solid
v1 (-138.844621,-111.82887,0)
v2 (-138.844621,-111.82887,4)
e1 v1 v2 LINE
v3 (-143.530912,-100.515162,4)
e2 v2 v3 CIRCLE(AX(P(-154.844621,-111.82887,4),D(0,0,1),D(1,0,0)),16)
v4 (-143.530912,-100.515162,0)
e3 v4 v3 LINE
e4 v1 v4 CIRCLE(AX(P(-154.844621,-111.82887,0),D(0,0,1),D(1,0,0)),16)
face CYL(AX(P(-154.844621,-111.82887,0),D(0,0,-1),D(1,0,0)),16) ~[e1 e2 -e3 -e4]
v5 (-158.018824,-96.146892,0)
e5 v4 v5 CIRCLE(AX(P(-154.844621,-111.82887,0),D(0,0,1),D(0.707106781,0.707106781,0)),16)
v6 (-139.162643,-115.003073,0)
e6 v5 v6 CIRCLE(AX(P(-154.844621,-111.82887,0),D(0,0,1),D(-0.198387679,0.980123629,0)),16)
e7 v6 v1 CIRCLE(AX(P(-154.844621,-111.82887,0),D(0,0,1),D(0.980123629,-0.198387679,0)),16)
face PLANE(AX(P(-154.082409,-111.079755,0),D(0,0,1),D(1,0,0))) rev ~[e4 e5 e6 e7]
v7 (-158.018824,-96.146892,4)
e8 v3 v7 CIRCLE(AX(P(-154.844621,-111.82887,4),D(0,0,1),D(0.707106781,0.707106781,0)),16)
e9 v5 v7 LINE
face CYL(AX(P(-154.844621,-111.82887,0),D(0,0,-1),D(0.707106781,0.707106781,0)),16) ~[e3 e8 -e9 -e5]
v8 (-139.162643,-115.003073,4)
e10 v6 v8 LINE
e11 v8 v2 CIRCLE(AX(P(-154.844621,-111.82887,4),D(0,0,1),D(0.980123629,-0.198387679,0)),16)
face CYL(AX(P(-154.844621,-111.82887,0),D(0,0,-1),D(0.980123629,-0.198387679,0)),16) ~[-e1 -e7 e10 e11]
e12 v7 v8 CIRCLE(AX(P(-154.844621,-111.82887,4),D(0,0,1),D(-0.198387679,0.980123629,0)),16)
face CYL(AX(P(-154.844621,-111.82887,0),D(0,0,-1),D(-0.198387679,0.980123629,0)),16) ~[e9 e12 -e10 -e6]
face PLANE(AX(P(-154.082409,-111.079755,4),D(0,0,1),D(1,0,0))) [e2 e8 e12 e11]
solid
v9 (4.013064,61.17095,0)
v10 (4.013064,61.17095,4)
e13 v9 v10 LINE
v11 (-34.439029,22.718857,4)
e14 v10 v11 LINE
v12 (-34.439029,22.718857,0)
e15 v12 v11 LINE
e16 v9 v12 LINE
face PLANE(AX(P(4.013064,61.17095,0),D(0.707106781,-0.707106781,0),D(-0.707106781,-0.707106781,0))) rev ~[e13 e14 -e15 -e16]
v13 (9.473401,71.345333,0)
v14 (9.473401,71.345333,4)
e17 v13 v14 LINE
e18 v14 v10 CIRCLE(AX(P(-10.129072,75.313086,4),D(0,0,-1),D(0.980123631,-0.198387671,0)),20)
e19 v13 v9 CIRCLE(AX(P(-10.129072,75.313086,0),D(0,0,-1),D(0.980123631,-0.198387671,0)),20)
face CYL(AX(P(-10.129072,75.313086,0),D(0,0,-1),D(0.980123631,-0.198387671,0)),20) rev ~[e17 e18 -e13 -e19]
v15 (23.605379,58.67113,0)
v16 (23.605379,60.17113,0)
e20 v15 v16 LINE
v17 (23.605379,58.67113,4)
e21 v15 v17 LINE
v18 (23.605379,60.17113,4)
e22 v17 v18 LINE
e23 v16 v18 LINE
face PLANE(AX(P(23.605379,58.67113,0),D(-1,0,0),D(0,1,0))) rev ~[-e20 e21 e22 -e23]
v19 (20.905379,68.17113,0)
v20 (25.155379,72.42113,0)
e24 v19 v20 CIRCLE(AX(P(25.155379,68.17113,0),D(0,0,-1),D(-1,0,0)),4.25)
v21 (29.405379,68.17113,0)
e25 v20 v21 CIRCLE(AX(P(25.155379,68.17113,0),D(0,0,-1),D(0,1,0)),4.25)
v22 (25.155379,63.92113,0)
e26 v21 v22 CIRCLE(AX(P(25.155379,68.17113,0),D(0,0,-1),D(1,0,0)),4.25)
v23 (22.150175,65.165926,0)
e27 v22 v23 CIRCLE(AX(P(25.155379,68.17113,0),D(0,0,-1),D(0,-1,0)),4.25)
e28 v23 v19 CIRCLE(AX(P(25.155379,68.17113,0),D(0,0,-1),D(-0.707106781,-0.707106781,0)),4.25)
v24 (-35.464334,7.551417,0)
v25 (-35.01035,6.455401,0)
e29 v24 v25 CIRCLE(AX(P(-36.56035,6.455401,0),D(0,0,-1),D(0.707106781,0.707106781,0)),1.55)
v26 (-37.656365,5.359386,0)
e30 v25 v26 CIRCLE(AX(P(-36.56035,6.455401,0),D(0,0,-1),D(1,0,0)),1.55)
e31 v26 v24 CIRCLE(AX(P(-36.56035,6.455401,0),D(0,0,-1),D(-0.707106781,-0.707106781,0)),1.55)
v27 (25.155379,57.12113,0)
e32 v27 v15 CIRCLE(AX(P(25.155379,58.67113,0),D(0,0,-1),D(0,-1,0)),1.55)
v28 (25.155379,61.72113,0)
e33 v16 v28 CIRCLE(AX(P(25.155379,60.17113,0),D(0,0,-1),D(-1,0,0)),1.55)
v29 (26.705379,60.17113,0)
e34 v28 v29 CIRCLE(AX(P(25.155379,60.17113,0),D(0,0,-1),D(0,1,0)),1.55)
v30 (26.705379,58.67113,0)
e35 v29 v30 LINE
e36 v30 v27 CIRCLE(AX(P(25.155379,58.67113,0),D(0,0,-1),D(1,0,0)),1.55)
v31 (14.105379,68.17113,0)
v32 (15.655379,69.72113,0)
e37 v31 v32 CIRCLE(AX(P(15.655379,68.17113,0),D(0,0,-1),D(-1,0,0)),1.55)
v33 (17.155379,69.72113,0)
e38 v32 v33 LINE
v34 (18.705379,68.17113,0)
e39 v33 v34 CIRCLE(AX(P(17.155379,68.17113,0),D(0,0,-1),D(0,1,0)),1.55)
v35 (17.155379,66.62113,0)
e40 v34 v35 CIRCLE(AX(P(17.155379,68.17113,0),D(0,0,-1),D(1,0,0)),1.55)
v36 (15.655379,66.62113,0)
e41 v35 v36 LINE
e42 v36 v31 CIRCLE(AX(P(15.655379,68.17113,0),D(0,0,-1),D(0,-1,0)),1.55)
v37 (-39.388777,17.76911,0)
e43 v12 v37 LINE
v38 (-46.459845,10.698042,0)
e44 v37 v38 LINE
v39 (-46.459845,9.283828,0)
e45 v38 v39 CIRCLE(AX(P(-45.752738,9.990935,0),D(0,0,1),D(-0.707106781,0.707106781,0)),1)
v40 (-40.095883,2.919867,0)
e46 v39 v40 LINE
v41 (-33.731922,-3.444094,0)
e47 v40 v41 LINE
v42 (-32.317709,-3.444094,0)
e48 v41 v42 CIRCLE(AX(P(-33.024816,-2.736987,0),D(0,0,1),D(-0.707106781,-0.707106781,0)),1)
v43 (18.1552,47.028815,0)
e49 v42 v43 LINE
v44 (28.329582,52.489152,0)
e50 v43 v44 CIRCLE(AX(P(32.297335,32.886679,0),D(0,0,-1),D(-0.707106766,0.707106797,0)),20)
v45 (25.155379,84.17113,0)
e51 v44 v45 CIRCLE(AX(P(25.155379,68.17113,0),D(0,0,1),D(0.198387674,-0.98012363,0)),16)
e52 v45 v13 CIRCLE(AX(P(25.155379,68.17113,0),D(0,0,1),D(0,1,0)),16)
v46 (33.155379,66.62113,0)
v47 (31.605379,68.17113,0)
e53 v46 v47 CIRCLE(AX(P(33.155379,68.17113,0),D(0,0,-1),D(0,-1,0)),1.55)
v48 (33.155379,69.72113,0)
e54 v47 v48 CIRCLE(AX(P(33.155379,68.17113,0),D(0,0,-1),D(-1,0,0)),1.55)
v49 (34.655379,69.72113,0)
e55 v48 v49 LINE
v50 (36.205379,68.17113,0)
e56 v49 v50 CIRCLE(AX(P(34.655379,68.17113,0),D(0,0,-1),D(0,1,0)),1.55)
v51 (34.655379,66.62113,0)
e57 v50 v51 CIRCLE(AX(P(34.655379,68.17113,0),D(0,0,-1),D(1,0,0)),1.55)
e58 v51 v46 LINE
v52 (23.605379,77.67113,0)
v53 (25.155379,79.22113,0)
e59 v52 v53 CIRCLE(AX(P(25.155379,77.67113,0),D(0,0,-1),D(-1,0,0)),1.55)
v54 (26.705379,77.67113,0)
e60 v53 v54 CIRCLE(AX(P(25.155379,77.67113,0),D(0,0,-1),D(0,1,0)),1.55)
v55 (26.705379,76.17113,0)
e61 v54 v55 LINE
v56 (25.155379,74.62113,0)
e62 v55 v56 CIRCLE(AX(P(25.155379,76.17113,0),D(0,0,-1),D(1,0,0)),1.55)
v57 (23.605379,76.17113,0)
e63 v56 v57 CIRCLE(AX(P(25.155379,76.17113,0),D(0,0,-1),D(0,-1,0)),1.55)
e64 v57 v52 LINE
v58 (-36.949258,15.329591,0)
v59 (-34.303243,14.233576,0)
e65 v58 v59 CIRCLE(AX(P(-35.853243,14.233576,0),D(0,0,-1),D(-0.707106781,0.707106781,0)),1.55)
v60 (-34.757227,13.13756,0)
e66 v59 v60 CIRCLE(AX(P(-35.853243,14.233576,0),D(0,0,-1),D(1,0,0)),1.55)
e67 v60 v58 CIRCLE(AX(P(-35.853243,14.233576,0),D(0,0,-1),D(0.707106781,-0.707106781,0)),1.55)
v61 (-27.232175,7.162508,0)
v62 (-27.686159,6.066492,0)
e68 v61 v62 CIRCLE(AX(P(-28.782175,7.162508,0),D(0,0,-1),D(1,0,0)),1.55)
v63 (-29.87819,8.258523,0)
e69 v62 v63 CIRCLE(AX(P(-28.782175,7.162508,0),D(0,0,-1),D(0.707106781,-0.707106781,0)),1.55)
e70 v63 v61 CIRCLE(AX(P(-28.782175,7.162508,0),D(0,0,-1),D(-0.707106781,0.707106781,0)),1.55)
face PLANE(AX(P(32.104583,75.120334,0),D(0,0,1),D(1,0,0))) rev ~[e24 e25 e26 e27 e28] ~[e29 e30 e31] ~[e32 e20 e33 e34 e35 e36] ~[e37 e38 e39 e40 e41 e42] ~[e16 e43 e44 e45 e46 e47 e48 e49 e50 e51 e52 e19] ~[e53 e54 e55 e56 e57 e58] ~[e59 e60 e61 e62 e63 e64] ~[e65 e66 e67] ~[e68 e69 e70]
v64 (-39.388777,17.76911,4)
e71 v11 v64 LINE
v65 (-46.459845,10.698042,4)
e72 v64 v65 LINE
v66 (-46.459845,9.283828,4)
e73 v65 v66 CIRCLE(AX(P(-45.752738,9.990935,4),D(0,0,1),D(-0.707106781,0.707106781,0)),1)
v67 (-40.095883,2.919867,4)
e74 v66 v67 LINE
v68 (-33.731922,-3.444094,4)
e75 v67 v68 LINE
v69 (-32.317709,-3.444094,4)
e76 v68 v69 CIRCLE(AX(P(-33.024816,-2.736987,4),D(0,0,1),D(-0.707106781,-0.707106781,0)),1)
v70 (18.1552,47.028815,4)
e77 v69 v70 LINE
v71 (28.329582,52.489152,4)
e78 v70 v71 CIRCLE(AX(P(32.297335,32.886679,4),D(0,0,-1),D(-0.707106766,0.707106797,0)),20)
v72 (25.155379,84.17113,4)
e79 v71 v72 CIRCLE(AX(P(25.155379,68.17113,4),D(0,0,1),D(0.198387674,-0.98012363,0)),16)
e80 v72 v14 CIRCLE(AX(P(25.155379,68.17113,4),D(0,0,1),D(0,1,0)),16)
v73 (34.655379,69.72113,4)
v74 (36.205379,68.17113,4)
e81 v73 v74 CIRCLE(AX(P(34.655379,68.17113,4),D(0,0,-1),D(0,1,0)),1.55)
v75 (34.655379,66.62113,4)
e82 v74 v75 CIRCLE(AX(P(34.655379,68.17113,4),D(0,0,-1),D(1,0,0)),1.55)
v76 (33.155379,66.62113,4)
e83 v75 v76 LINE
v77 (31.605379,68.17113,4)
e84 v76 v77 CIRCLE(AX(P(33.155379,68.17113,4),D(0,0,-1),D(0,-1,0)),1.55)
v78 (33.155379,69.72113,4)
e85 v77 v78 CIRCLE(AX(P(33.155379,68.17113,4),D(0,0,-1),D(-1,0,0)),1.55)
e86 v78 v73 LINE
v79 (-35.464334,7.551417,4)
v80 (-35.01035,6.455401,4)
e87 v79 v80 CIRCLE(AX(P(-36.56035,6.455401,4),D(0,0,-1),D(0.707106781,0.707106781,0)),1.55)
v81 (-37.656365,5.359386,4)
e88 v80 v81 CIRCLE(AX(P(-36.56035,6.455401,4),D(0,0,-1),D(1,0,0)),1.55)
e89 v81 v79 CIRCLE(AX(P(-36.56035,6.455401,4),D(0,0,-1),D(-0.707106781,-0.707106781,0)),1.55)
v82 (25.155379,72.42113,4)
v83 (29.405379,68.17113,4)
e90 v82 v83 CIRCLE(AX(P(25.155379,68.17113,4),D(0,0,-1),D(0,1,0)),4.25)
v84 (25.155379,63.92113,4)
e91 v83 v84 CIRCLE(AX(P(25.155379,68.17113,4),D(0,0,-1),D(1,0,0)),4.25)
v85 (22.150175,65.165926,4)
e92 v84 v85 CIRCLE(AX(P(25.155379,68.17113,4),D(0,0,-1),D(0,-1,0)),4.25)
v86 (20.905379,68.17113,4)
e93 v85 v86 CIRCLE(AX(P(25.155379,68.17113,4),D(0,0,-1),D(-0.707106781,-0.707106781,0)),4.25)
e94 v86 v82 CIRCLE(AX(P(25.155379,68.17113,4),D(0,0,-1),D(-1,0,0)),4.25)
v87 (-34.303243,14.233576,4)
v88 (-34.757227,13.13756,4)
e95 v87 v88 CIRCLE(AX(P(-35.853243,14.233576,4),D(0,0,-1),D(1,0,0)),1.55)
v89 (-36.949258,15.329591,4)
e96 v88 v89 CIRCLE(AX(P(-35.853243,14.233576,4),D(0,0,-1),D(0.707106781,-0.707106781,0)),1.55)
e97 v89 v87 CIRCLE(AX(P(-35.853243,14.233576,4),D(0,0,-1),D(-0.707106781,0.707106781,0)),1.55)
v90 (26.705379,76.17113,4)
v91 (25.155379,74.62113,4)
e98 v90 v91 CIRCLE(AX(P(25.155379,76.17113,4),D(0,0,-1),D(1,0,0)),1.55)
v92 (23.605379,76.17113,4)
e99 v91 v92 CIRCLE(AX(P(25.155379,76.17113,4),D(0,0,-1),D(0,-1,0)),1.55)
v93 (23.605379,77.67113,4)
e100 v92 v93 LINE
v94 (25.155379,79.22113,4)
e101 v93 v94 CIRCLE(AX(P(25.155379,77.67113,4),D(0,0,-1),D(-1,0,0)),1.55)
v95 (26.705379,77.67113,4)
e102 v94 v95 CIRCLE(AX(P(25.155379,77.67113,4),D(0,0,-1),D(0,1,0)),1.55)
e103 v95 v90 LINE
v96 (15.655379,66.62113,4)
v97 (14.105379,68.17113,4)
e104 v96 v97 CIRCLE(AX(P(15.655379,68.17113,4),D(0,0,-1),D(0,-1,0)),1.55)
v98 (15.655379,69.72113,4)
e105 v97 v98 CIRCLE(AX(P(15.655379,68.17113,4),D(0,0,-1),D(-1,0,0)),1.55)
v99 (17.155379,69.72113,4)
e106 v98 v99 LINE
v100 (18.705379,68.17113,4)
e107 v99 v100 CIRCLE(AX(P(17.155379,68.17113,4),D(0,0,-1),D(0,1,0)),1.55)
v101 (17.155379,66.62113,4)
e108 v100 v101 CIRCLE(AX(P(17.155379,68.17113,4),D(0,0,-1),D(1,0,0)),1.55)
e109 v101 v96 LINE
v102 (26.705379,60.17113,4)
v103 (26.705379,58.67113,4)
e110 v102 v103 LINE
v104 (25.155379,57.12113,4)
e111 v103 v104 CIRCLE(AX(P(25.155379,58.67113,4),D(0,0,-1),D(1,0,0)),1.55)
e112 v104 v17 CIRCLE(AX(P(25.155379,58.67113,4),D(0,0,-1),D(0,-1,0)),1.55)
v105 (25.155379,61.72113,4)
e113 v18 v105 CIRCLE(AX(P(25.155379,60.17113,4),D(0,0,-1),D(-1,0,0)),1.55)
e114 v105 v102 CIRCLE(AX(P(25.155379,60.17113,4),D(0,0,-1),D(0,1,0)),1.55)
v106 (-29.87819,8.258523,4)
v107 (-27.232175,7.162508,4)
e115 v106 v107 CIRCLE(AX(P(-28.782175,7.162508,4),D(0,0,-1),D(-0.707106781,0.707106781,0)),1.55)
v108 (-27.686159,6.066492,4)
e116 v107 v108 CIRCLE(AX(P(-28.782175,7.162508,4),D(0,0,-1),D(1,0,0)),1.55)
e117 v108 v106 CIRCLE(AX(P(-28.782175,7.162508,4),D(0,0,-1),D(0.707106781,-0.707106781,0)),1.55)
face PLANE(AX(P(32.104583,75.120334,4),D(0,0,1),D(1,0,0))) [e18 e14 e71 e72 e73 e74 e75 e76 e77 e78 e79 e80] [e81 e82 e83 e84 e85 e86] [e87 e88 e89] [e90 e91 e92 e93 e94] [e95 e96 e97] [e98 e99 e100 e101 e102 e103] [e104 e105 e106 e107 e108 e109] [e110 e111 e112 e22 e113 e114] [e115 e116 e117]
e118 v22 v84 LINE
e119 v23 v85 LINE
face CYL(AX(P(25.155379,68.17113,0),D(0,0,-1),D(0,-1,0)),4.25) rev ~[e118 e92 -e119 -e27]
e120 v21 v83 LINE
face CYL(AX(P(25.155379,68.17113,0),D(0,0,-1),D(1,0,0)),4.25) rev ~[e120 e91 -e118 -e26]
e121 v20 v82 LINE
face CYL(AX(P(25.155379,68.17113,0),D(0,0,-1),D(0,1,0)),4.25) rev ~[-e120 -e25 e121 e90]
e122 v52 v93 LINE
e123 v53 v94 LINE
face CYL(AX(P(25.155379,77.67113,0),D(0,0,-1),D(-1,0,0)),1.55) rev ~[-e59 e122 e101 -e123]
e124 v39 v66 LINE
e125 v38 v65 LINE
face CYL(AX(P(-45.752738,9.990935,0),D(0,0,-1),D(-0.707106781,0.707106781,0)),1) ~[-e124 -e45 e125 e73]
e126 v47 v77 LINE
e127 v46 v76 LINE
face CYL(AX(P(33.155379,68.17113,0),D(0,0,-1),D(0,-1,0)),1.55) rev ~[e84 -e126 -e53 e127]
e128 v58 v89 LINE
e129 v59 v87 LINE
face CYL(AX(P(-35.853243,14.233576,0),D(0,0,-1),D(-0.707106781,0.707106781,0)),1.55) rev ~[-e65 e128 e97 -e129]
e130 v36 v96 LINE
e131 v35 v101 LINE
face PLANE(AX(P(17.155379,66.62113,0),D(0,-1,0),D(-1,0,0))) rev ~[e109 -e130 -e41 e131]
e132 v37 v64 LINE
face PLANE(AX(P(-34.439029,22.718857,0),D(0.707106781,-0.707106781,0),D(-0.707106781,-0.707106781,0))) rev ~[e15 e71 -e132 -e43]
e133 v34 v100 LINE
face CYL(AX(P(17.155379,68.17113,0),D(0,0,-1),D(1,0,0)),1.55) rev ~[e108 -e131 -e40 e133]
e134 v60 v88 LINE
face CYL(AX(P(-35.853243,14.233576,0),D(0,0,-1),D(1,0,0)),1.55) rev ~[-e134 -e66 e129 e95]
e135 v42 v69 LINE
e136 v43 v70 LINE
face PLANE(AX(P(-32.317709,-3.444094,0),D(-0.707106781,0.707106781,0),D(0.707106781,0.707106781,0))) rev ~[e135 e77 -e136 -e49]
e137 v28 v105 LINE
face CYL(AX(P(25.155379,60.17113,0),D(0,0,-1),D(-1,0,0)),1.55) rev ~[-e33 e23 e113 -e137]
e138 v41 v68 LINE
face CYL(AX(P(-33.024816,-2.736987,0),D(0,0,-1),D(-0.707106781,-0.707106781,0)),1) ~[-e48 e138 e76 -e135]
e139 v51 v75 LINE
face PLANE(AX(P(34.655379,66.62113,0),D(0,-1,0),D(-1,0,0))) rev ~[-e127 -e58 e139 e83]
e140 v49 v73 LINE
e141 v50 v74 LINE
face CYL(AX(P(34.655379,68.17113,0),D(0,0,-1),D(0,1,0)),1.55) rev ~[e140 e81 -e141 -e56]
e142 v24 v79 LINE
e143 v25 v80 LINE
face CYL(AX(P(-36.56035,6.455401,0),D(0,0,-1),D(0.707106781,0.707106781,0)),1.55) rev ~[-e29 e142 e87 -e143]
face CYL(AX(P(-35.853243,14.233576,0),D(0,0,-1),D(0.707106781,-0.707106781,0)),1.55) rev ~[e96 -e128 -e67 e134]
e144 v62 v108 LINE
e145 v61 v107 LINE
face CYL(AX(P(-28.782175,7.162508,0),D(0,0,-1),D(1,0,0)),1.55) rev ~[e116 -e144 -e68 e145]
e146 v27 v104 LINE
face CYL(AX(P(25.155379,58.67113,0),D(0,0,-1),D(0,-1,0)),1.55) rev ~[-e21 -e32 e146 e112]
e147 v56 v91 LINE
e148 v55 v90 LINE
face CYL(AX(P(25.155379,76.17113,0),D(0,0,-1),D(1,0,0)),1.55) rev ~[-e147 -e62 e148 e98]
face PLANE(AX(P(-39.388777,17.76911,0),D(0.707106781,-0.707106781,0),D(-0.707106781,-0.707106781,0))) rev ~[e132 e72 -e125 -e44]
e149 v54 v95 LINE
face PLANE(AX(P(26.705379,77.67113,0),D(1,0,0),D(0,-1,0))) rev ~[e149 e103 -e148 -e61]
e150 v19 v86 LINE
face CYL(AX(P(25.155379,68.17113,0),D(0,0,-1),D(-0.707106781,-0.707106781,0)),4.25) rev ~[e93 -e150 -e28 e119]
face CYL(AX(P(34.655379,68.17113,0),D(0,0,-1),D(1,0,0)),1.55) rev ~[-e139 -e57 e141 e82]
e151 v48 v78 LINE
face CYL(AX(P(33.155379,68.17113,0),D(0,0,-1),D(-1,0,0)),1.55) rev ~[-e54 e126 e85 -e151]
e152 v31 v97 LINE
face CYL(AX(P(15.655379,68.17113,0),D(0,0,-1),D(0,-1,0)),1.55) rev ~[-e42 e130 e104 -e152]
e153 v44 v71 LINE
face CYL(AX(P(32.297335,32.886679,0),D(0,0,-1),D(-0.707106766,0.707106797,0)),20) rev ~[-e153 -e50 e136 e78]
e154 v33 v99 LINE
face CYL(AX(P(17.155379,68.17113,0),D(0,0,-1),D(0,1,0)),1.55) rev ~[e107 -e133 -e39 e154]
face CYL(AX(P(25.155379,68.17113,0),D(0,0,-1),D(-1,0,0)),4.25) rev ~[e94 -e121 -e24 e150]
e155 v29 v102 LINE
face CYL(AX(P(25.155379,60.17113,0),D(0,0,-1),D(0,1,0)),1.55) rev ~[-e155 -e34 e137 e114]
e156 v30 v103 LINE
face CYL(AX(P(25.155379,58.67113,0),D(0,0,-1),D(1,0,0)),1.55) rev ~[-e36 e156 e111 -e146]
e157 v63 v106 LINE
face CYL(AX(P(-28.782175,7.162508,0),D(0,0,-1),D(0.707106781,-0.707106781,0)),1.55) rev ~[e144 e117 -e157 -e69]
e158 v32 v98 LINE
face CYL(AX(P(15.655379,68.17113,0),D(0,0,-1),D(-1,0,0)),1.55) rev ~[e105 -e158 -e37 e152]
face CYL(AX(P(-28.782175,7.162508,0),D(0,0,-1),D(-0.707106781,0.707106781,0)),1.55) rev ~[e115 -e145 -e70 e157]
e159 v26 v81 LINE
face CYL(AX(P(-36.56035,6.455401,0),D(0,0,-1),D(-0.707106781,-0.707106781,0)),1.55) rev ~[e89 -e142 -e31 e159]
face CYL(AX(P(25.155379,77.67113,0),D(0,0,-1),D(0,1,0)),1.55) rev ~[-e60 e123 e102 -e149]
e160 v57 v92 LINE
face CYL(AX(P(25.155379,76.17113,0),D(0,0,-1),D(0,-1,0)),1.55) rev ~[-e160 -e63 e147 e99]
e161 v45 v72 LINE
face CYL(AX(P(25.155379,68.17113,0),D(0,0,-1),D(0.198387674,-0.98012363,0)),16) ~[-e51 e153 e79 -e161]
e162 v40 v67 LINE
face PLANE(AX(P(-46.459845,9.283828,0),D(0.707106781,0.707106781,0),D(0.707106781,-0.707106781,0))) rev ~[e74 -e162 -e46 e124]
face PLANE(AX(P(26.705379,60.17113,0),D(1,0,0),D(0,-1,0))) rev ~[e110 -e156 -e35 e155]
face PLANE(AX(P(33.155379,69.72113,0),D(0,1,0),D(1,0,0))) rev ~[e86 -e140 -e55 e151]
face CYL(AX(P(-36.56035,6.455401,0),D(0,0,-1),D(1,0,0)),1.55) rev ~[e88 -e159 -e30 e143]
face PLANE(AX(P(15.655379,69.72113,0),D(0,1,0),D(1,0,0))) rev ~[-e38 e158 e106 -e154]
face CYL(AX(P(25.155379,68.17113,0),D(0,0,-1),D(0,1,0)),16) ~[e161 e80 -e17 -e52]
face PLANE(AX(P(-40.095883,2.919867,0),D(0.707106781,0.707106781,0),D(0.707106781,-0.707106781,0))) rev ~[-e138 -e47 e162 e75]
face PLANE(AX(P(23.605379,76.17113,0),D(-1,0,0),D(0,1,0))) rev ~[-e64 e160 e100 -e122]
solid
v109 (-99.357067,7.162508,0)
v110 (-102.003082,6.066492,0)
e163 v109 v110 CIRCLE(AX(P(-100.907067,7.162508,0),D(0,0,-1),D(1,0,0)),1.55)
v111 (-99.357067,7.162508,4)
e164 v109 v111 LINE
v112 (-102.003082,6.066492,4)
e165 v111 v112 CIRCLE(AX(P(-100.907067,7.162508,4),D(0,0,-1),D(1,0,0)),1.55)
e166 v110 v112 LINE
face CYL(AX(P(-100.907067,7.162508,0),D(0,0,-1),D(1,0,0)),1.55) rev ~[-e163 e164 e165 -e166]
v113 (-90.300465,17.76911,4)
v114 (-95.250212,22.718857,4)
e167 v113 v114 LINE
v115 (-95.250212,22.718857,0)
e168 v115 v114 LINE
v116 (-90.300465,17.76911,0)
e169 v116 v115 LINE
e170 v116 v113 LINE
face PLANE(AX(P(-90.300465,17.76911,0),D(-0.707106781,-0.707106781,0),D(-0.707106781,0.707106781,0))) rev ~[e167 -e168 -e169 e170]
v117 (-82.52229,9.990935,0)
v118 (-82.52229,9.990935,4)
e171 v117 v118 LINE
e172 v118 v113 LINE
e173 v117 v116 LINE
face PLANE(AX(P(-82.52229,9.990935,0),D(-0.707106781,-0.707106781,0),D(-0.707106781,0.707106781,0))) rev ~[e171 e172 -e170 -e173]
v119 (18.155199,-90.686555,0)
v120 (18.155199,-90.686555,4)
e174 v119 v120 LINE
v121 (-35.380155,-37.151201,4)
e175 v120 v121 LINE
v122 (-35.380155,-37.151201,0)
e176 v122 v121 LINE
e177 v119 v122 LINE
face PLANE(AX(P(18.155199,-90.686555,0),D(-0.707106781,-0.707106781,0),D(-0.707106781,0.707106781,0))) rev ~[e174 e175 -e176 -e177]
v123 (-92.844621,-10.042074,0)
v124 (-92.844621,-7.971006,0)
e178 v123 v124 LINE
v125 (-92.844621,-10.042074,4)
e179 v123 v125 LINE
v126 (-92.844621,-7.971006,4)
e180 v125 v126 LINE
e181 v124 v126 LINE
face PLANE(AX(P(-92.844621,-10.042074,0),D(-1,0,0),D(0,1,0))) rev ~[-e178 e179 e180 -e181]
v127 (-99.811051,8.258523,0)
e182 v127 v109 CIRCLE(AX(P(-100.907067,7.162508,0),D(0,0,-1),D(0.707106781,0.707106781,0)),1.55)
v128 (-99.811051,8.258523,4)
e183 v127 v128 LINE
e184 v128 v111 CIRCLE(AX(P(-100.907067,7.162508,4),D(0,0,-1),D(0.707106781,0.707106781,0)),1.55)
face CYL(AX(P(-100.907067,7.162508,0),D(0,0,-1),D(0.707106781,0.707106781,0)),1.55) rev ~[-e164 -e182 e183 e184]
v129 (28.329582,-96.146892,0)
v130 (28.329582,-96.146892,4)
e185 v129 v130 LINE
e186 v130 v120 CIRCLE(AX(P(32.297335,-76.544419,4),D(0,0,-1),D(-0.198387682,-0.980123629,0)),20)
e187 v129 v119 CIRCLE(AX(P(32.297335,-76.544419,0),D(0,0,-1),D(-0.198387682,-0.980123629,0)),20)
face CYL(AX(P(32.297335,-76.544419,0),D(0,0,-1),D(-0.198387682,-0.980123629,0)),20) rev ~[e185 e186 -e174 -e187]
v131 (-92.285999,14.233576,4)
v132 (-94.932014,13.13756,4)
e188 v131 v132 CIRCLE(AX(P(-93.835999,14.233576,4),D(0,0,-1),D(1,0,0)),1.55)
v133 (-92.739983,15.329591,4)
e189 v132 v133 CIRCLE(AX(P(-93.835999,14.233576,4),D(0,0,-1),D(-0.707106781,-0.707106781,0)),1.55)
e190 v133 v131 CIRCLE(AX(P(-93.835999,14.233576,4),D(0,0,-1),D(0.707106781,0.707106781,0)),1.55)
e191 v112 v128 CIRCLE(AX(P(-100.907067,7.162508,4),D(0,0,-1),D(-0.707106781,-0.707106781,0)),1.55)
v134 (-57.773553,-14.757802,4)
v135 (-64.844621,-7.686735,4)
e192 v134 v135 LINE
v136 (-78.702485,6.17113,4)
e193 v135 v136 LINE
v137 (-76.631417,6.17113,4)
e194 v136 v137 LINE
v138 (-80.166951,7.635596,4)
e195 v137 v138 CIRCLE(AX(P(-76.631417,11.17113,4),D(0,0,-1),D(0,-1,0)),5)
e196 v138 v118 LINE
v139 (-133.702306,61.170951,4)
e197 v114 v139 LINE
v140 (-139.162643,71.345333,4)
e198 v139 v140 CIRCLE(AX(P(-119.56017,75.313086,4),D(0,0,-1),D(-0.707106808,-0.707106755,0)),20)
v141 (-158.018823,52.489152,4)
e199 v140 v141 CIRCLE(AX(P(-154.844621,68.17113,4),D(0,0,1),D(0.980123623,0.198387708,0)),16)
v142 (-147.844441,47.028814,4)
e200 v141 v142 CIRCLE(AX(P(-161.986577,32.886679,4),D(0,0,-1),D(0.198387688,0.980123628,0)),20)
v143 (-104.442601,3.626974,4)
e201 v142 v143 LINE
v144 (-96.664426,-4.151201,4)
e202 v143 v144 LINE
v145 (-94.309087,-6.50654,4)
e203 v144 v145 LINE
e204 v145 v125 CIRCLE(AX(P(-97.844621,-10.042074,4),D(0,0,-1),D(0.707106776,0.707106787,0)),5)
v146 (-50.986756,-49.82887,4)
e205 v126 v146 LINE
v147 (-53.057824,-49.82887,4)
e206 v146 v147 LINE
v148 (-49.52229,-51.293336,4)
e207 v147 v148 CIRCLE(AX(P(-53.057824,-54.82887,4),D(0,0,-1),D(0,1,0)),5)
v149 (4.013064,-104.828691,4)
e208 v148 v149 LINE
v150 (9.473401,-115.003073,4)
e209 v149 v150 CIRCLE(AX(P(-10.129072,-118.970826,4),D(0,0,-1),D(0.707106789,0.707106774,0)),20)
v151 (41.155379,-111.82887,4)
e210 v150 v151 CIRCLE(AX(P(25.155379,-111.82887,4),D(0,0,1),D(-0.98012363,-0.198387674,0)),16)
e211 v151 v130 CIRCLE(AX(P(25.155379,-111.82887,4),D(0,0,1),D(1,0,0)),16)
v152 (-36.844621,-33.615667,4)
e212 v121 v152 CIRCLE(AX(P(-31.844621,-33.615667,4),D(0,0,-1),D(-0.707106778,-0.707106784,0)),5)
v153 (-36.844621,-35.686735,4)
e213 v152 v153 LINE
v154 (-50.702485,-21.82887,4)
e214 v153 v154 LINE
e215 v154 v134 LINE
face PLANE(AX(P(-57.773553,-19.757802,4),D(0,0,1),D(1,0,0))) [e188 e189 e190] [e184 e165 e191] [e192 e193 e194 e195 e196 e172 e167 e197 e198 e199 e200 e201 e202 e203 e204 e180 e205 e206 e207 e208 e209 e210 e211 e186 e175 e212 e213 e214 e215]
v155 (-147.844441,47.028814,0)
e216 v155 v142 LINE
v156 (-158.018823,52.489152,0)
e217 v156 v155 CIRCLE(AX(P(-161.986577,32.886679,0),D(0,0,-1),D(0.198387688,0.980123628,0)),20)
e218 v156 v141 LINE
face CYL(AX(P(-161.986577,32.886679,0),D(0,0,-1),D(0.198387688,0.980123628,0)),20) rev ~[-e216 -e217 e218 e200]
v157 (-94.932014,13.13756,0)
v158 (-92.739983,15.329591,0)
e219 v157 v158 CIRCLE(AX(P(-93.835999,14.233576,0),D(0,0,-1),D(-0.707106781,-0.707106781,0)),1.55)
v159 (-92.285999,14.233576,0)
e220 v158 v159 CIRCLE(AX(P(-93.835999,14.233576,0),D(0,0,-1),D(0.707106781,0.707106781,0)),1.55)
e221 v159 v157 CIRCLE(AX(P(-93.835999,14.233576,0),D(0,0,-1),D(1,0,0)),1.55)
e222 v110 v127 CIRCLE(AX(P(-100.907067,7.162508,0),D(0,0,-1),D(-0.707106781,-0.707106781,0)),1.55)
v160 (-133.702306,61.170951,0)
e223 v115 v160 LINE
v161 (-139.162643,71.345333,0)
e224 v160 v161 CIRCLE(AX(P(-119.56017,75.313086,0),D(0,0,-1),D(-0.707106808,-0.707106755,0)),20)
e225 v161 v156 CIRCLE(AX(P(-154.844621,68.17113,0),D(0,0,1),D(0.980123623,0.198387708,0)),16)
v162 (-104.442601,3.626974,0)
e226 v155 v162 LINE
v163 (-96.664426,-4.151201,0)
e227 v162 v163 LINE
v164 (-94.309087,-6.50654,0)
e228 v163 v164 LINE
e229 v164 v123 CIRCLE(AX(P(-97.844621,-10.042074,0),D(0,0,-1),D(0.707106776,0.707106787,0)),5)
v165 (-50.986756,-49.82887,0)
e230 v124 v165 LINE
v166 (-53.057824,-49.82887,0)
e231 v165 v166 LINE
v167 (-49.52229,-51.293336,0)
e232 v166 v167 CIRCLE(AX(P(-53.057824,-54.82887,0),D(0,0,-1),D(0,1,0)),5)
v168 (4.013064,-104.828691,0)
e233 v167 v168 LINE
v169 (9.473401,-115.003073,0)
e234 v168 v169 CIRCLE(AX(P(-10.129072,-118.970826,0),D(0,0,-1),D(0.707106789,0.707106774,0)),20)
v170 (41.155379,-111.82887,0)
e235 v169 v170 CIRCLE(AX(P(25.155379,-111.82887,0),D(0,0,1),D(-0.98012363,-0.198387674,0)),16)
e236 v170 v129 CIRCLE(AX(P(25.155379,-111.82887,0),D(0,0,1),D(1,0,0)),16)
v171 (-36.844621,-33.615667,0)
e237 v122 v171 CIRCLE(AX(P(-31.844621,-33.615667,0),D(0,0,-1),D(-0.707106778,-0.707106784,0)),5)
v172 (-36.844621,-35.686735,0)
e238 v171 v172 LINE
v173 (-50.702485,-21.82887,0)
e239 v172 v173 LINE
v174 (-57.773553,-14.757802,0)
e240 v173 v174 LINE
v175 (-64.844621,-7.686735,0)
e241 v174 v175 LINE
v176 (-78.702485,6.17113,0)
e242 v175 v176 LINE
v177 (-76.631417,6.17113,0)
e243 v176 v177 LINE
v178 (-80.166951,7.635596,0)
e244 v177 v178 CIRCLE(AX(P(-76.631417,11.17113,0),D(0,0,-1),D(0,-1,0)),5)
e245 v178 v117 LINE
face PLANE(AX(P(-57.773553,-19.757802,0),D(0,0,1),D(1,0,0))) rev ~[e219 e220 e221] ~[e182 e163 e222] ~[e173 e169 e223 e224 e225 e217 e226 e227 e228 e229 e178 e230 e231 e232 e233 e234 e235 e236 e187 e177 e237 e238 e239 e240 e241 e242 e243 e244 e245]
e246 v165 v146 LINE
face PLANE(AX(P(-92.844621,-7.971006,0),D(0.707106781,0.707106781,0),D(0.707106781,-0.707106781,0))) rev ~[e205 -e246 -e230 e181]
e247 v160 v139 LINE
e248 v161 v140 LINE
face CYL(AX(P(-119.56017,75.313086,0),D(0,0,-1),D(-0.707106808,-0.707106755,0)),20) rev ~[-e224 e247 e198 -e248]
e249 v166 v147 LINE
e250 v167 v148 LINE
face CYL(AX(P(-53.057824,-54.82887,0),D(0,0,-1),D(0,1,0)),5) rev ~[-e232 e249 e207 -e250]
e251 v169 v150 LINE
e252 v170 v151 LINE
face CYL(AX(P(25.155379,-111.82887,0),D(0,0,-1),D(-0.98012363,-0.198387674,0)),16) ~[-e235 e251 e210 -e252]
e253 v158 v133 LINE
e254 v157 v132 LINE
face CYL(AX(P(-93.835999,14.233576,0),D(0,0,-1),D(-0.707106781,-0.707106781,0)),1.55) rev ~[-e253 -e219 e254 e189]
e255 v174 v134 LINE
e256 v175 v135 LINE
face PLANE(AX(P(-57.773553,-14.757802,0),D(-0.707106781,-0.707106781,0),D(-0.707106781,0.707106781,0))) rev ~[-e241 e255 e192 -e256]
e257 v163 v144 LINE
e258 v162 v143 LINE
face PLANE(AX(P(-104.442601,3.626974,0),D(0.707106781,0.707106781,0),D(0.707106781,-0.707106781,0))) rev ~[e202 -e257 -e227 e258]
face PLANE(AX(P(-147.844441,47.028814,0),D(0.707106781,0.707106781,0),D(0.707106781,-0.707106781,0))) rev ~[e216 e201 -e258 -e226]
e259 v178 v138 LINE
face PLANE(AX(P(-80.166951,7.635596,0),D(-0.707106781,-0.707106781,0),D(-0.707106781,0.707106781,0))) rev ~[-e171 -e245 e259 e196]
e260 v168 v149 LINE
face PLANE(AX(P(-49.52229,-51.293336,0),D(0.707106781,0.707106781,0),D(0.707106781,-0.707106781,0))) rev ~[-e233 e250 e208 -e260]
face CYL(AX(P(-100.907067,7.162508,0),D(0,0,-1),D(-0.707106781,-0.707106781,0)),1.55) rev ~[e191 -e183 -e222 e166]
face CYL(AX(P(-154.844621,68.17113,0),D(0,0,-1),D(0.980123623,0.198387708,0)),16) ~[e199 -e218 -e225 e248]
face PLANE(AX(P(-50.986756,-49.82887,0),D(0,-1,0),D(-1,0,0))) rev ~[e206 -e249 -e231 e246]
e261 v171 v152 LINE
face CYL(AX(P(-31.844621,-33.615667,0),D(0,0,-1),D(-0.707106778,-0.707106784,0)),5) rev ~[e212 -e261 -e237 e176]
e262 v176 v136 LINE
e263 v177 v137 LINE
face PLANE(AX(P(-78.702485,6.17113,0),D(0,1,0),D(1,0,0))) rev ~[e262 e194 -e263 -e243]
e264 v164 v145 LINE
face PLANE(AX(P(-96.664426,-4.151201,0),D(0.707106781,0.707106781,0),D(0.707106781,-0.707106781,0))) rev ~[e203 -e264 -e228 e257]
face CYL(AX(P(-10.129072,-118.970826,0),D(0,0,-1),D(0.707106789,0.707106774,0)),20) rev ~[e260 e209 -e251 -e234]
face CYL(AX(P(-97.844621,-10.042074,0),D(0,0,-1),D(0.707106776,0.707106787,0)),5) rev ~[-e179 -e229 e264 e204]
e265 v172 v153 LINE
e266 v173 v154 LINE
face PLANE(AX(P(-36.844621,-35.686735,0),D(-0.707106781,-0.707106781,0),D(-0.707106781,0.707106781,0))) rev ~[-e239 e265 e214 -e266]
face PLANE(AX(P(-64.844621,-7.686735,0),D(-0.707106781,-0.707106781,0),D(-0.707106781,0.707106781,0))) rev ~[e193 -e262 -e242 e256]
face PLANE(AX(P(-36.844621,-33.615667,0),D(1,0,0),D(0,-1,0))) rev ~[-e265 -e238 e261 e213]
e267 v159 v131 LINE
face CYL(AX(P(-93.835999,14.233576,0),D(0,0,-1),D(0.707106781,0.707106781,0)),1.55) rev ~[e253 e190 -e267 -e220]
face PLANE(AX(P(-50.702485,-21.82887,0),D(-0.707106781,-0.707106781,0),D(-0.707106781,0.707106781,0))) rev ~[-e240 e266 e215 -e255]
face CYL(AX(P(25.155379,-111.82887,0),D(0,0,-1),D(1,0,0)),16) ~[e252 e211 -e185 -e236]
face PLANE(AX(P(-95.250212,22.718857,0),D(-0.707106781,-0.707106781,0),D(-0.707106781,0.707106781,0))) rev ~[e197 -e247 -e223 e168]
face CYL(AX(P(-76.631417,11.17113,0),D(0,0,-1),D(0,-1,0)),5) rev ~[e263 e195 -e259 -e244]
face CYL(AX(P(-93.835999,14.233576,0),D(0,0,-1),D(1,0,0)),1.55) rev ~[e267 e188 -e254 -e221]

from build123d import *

# Parameters (mm, degrees)
F1_DEPTH = 4


# Not quite as in the source:
# - a feature names something its author has since deleted; it is built from what else it names


with BuildPart() as f1:
    # F0 (on Top) → F1 (new body)
    with BuildSketch(Plane.XY):
        with BuildLine():
            Line((36.2053791718, 68.1711297919), (41.1553791718, 68.1711297919))
            ThreePointArc((41.1553791718, 68.1711297919), (36.4690876708, 79.4848382909), (25.1553791718, 84.1711297919))
            Line((25.1553791718, 84.1711297919), (25.1553791718, 79.2211297919))
            ThreePointArc((25.1553791718, 79.2211297919), (26.2513946827, 78.7671453027), (26.7053791718, 77.6711297919))
            Line((26.7053791718, 77.6711297919), (26.7053791718, 76.1711297919))
            ThreePointArc((26.7053791718, 76.1711297919), (26.2513946827, 75.075114281), (25.1553791718, 74.6211297919))
            Line((25.1553791718, 74.6211297919), (25.1553791718, 72.4211297919))
            ThreePointArc((25.1553791718, 72.4211297919), (28.1605829919, 71.1763336119), (29.4053791718, 68.1711297919))
            Line((29.4053791718, 68.1711297919), (31.6053791718, 68.1711297919))
            ThreePointArc((31.6053791718, 68.1711297919), (32.059363661, 69.2671453027), (33.1553791718, 69.7211297919))
            Line((33.1553791718, 69.7211297919), (34.6553791718, 69.7211297919))
            ThreePointArc((34.6553791718, 69.7211297919), (35.7513946827, 69.2671453027), (36.2053791718, 68.1711297919))
        make_face()
        with BuildLine():
            ThreePointArc((28.3295819531, 52.4891517054), (37.5405970645, 58.041649166), (41.1553791718, 68.1711297919))
            Line((41.1553791718, 68.1711297919), (36.2053791718, 68.1711297919))
            ThreePointArc((36.2053791718, 68.1711297919), (35.7513946827, 67.075114281), (34.6553791718, 66.6211297919))
            Line((34.6553791718, 66.6211297919), (33.1553791718, 66.6211297919))
            ThreePointArc((33.1553791718, 66.6211297919), (32.059363661, 67.075114281), (31.6053791718, 68.1711297919))
            Line((31.6053791718, 68.1711297919), (29.4053791718, 68.1711297919))
            ThreePointArc((29.4053791718, 68.1711297919), (28.1605829919, 65.1659259718), (25.1553791718, 63.9211297919))
            Line((25.1553791718, 63.9211297919), (25.1553791718, 61.7211297919))
            ThreePointArc((25.1553791718, 61.7211297919), (26.2513946827, 61.2671453027), (26.7053791718, 60.1711297919))
            Line((26.7053791718, 60.1711297919), (26.7053791718, 58.6711297919))
            ThreePointArc((26.7053791718, 58.6711297919), (26.2513946827, 57.575114281), (25.1553791718, 57.1211297919))
            Line((25.1553791718, 57.1211297919), (25.1553791718, 52.1711297919))
            ThreePointArc((25.1553791718, 52.1711297919), (26.7504262898, 52.250833793), (28.3295819531, 52.4891517054))
        make_face()
        with BuildLine():
            Line((25.1553791718, 79.2211297919), (25.1553791718, 84.1711297919))
            ThreePointArc((25.1553791718, 84.1711297919), (15.0258985265, 80.5563476687), (9.4734010754, 71.3453325238))
            ThreePointArc((9.4734010754, 71.3453325238), (9.2350831705, 69.7661768848), (9.1553791718, 68.1711297919))
            Line((9.1553791718, 68.1711297919), (14.1053791718, 68.1711297919))
            ThreePointArc((14.1053791718, 68.1711297919), (14.559363661, 69.2671453027), (15.6553791718, 69.7211297919))
            Line((15.6553791718, 69.7211297919), (17.1553791718, 69.7211297919))
            ThreePointArc((17.1553791718, 69.7211297919), (18.2513946827, 69.2671453027), (18.7053791718, 68.1711297919))
            Line((18.7053791718, 68.1711297919), (20.9053791718, 68.1711297919))
            ThreePointArc((20.9053791718, 68.1711297919), (22.1501753518, 71.1763336119), (25.1553791718, 72.4211297919))
            Line((25.1553791718, 72.4211297919), (25.1553791718, 74.6211297919))
            ThreePointArc((25.1553791718, 74.6211297919), (24.059363661, 75.075114281), (23.6053791718, 76.1711297919))
            Line((23.6053791718, 76.1711297919), (23.6053791718, 77.6711297919))
            ThreePointArc((23.6053791718, 77.6711297919), (24.059363661, 78.7671453027), (25.1553791718, 79.2211297919))
        make_face()
        with BuildLine():
            ThreePointArc((18.1552000116, 47.0288150079), (22.8397544367, 50.5092261028), (28.3295819531, 52.4891517054))
            ThreePointArc((28.3295819531, 52.4891517054), (26.7504262898, 52.250833793), (25.1553791718, 52.1711297919))
            ThreePointArc((25.1553791718, 52.1711297919), (24.273692961, 52.1954410923), (23.3946861174, 52.2683011137))
            Line((23.3946861174, 52.2683011137), (18.1552000116, 47.0288150079))
        make_face()
        with BuildLine():
            ThreePointArc((9.1553791718, 68.1711297919), (9.2350831705, 69.7661768848), (9.4734010754, 71.3453325238))
            ThreePointArc((9.4734010754, 71.3453325238), (7.4934752577, 65.8555046373), (4.0130637502, 61.170949994))
            Line((4.0130637502, 61.170949994), (9.2525504936, 66.4104367374))
            ThreePointArc((9.2525504936, 66.4104367374), (9.1796904723, 67.289443581), (9.1553791718, 68.1711297919))
        make_face()
        with BuildLine():
            ThreePointArc((23.3946861174, 52.2683011137), (24.273692961, 52.1954410923), (25.1553791718, 52.1711297919))
            Line((25.1553791718, 52.1711297919), (25.1553791718, 57.1211297919))
            ThreePointArc((25.1553791718, 57.1211297919), (24.059363661, 57.575114281), (23.6053791718, 58.6711297919))
            Line((23.6053791718, 58.6711297919), (23.6053791718, 60.1711297919))
            ThreePointArc((23.6053791718, 60.1711297919), (24.059363661, 61.2671453027), (25.1553791718, 61.7211297919))
            Line((25.1553791718, 61.7211297919), (25.1553791718, 63.9211297919))
            ThreePointArc((25.1553791718, 63.9211297919), (23.5289745843, 64.2446417787), (22.1501753518, 65.1659259718))
            Line((22.1501753518, 65.1659259718), (13.8416706728, 56.8574212929))
            ThreePointArc((13.8416706728, 56.8574212929), (18.2271759416, 53.74892469), (23.3946861174, 52.2683011137))
        make_face()
        with BuildLine():
            Line((-20.2968936134, 8.5767213829), (18.1552000116, 47.0288150079))
            Line((18.1552000116, 47.0288150079), (23.3946861174, 52.2683011137))
            ThreePointArc((23.3946861174, 52.2683011137), (18.2271759416, 53.74892469), (13.8416706728, 56.8574212929))
            Line((13.8416706728, 56.8574212929), (-27.3679614253, 15.6477891948))
            Line((-27.3679614253, 15.6477891948), (-20.2968936134, 8.5767213829))
        make_face()
        with BuildLine():
            Line((14.1053791718, 68.1711297919), (9.1553791718, 68.1711297919))
            ThreePointArc((9.1553791718, 68.1711297919), (9.1796904723, 67.289443581), (9.2525504936, 66.4104367374))
            ThreePointArc((9.2525504936, 66.4104367374), (10.73317407, 61.2429265616), (13.8416706728, 56.8574212929))
            Line((13.8416706728, 56.8574212929), (22.1501753518, 65.1659259718))
            ThreePointArc((22.1501753518, 65.1659259718), (21.2288911587, 66.5447252043), (20.9053791718, 68.1711297919))
            Line((20.9053791718, 68.1711297919), (18.7053791718, 68.1711297919))
            ThreePointArc((18.7053791718, 68.1711297919), (18.2513946827, 67.075114281), (17.1553791718, 66.6211297919))
            Line((17.1553791718, 66.6211297919), (15.6553791718, 66.6211297919))
            ThreePointArc((15.6553791718, 66.6211297919), (14.559363661, 67.075114281), (14.1053791718, 68.1711297919))
        make_face()
        with BuildLine():
            Line((9.2525504936, 66.4104367374), (4.0130637502, 61.170949994))
            Line((4.0130637502, 61.170949994), (-34.4390292371, 22.7188570066))
            Line((-34.4390292371, 22.7188570066), (-27.3679614253, 15.6477891948))
            Line((-27.3679614253, 15.6477891948), (13.8416706728, 56.8574212929))
            ThreePointArc((13.8416706728, 56.8574212929), (10.73317407, 61.2429265616), (9.2525504936, 66.4104367374))
        make_face()
        with BuildLine():
            Line((-25.2466410817, 3.6269739146), (-20.2968936134, 8.5767213829))
            Line((-20.2968936134, 8.5767213829), (-27.3679614253, 15.6477891948))
            Line((-27.3679614253, 15.6477891948), (-32.3177088936, 10.6980417265))
            Line((-32.3177088936, 10.6980417265), (-29.8781904985, 8.2585233314))
            ThreePointArc((-29.8781904985, 8.2585233314), (-28.1890156675, 8.5945210959), (-27.2321749877, 7.1625078205))
            ThreePointArc((-27.2321749877, 7.1625078205), (-27.3501617123, 6.5693485004), (-27.6861594768, 6.0664923097))
            Line((-27.6861594768, 6.0664923097), (-25.2466410817, 3.6269739146))
        make_face()
        with BuildLine():
            Line((-27.3679614253, 15.6477891948), (-34.4390292371, 22.7188570066))
            Line((-34.4390292371, 22.7188570066), (-39.3887767054, 17.7691095383))
            Line((-39.3887767054, 17.7691095383), (-36.9492583104, 15.3295911432))
            ThreePointArc((-36.9492583104, 15.3295911432), (-35.2600834794, 15.6655889078), (-34.3032427995, 14.2335756324))
            ThreePointArc((-34.3032427995, 14.2335756324), (-34.4212295241, 13.6404163122), (-34.7572272887, 13.1375601216))
            Line((-34.7572272887, 13.1375601216), (-32.3177088936, 10.6980417265))
            Line((-32.3177088936, 10.6980417265), (-27.3679614253, 15.6477891948))
        make_face()
        with BuildLine():
            Line((-32.3177088936, -3.4440938973), (-25.2466410817, 3.6269739146))
            Line((-25.2466410817, 3.6269739146), (-27.6861594768, 6.0664923097))
            ThreePointArc((-27.6861594768, 6.0664923097), (-29.8781904985, 6.0664923097), (-29.8781904985, 8.2585233314))
            Line((-29.8781904985, 8.2585233314), (-32.3177088936, 10.6980417265))
            Line((-32.3177088936, 10.6980417265), (-35.4643340699, 7.5514165502))
            ThreePointArc((-35.4643340699, 7.5514165502), (-35.1283363053, 7.0485603595), (-35.0103495807, 6.4554010393))
            ThreePointArc((-35.0103495807, 6.4554010393), (-35.9671902605, 5.023387764), (-37.6563650915, 5.3593855285))
            Line((-37.6563650915, 5.3593855285), (-40.0958834866, 2.9198671334))
            Line((-40.0958834866, 2.9198671334), (-33.731922456, -3.4440938973))
            ThreePointArc((-33.731922456, -3.4440938973), (-33.0248156748, -3.7369871161), (-32.3177088936, -3.4440938973))
        make_face()
        with BuildLine():
            Line((-36.9492583104, 15.3295911432), (-39.3887767054, 17.7691095383))
            Line((-39.3887767054, 17.7691095383), (-46.4598445173, 10.6980417265))
            ThreePointArc((-46.4598445173, 10.6980417265), (-46.7527377361, 9.9909349453), (-46.4598445173, 9.2838281641))
            Line((-46.4598445173, 9.2838281641), (-40.0958834866, 2.9198671334))
            Line((-40.0958834866, 2.9198671334), (-37.6563650915, 5.3593855285))
            ThreePointArc((-37.6563650915, 5.3593855285), (-37.6563650915, 7.5514165502), (-35.4643340699, 7.5514165502))
            Line((-35.4643340699, 7.5514165502), (-32.3177088936, 10.6980417265))
            Line((-32.3177088936, 10.6980417265), (-34.7572272887, 13.1375601216))
            ThreePointArc((-34.7572272887, 13.1375601216), (-36.9492583104, 13.1375601216), (-36.9492583104, 15.3295911432))
        make_face()
    extrude(amount=F1_DEPTH)


with BuildPart() as f1b:
    # F0 (on Top) → F1, piece 2 (new body)
    with BuildSketch(Plane.XY):
        with BuildLine():
            ThreePointArc((-138.8446208282, -111.8288702081), (-140.062548308, -105.7059352903), (-143.5309123292, -100.5151617091))
            ThreePointArc((-143.5309123292, -100.5151617091), (-150.2258187408, -96.5100364641), (-158.0188236998, -96.14689214))
            ThreePointArc((-158.0188236998, -96.14689214), (-166.1583293272, -123.1425787071), (-139.16264276, -115.0030730797))
            ThreePointArc((-139.16264276, -115.0030730797), (-138.9243248339, -113.4239173719), (-138.8446208282, -111.8288702081))
        make_face()
    extrude(amount=F1_DEPTH)


with BuildPart() as f1c:
    # F0 (on Top) → F1, piece 3 (new body)
    with BuildSketch(Plane.XY):
        Polygon((-50.7024852044, -21.8288702081), (-57.7735530163, -14.7578023963), (-64.8446208282, -21.8288702081), align=None)
        Polygon((-64.8446208282, -21.8288702081), (-57.7735530163, -14.7578023963), (-64.8446208282, -7.6867345844), align=None)
        Polygon((-78.9867564519, -21.8288702081), (-64.8446208282, -21.8288702081), (-89.5933581697, 2.9198671334), (-96.6644259816, -4.1512006785), (-94.3090869492, -6.5065397108), (-92.8446208282, -7.9710058318), align=None)
        with BuildLine():
            Line((-50.7024852044, -21.8288702081), (-64.8446208282, -21.8288702081))
            Line((-64.8446208282, -21.8288702081), (13.8416706728, -100.5151617091))
            ThreePointArc((13.8416706728, -100.5151617091), (18.2271759416, -97.4066651063), (23.3946861174, -95.9260415299))
            Line((23.3946861174, -95.9260415299), (18.1551993662, -90.6865547787))
            Line((18.1551993662, -90.6865547787), (-35.3801547186, -37.151200694))
            Line((-35.3801547186, -37.151200694), (-36.8446208282, -35.6867345844))
            Line((-36.8446208282, -35.6867345844), (-50.7024852044, -21.8288702081))
        make_face()
        Polygon((-64.8446208282, -35.9710058318), (-64.8446208282, -21.8288702081), (-71.91568864, -28.89993802), align=None)
        Polygon((-89.5933581697, 2.9198671334), (-64.8446208282, -21.8288702081), (-64.8446208282, -7.6867345844), (-78.7024852044, 6.1711297919), (-80.1669513924, 7.6355959798), (-82.5222903578, 9.9909349453), align=None)
        with BuildLine():
            Line((13.8416706728, -100.5151617091), (-64.8446208282, -21.8288702081))
            Line((-64.8446208282, -21.8288702081), (-64.8446208282, -35.9710058318))
            Line((-64.8446208282, -35.9710058318), (-50.9867564519, -49.8288702081))
            Line((-50.9867564519, -49.8288702081), (-49.5222903639, -51.2933362961))
            Line((-49.5222903639, -51.2933362961), (4.0130642277, -104.8286908877))
            Line((4.0130642277, -104.8286908877), (9.2525504936, -110.0681771537))
            ThreePointArc((9.2525504936, -110.0681771537), (10.73317407, -104.9006669778), (13.8416706728, -100.5151617091))
        make_face()
        Polygon((-71.91568864, -28.89993802), (-64.8446208282, -21.8288702081), (-78.9867564519, -21.8288702081), align=None)
        with BuildLine():
            Line((-96.6644259816, -4.1512006785), (-89.5933581697, 2.9198671334))
            Line((-89.5933581697, 2.9198671334), (-92.0328765648, 5.3593855285))
            ThreePointArc((-92.0328765648, 5.3593855285), (-94.2249075865, 5.3593855285), (-94.2249075865, 7.5514165502))
            Line((-94.2249075865, 7.5514165502), (-97.3715327627, 10.6980417265))
            Line((-97.3715327627, 10.6980417265), (-99.8110511578, 8.2585233314))
            ThreePointArc((-99.8110511578, 8.2585233314), (-99.4750533933, 7.7556671407), (-99.3570666687, 7.1625078205))
            ThreePointArc((-99.3570666687, 7.1625078205), (-100.3139073485, 5.7304945451), (-102.0030821795, 6.0664923097))
            Line((-102.0030821795, 6.0664923097), (-104.4426005746, 3.6269739146))
            Line((-104.4426005746, 3.6269739146), (-96.6644259816, -4.1512006785))
        make_face()
        with BuildLine():
            Line((-92.0328765648, 5.3593855285), (-89.5933581697, 2.9198671334))
            Line((-89.5933581697, 2.9198671334), (-82.5222903578, 9.9909349453))
            Line((-82.5222903578, 9.9909349453), (-90.3004649509, 17.7691095383))
            Line((-90.3004649509, 17.7691095383), (-92.739983346, 15.3295911432))
            ThreePointArc((-92.739983346, 15.3295911432), (-92.4039855814, 14.8267349526), (-92.2859988568, 14.2335756324))
            ThreePointArc((-92.2859988568, 14.2335756324), (-93.2428395366, 12.801562357), (-94.9320143677, 13.1375601216))
            Line((-94.9320143677, 13.1375601216), (-97.3715327627, 10.6980417265))
            Line((-97.3715327627, 10.6980417265), (-94.2249075865, 7.5514165502))
            ThreePointArc((-94.2249075865, 7.5514165502), (-92.5357327555, 7.8874143147), (-91.5788920756, 6.4554010393))
            ThreePointArc((-91.5788920756, 6.4554010393), (-91.6968788002, 5.8622417192), (-92.0328765648, 5.3593855285))
        make_face()
        with BuildLine():
            ThreePointArc((23.3946861174, -95.9260415299), (18.2271759416, -97.4066651063), (13.8416706728, -100.5151617091))
            ThreePointArc((13.8416706728, -100.5151617091), (10.73317407, -104.9006669778), (9.2525504936, -110.0681771537))
            ThreePointArc((9.2525504936, -110.0681771537), (9.1713776761, -112.5441996308), (9.4734010854, -115.0030729893))
            ThreePointArc((9.4734010854, -115.0030729893), (26.7504262898, -127.749166207), (41.1553791718, -111.8288702081))
            ThreePointArc((41.1553791718, -111.8288702081), (37.5405969765, -101.6993894746), (28.3295816805, -96.1468920665))
            ThreePointArc((28.3295816805, -96.1468920665), (25.8707084556, -95.8448687061), (23.3946861174, -95.9260415299))
        make_face()
        with BuildLine():
            Line((-80.1669513924, 7.6355959798), (-78.7024852044, 6.1711297919))
            Line((-78.7024852044, 6.1711297919), (-76.6314173926, 6.1711297919))
            ThreePointArc((-76.6314173926, 6.1711297919), (-78.5448346157, 6.5517321547), (-80.1669513924, 7.6355959798))
        make_face()
        with BuildLine():
            Line((-36.8446208282, -33.6156667725), (-36.8446208282, -35.6867345844))
            Line((-36.8446208282, -35.6867345844), (-35.3801547186, -37.151200694))
            ThreePointArc((-35.3801547186, -37.151200694), (-36.4640184865, -35.5290839445), (-36.8446208282, -33.6156667725))
        make_face()
        with BuildLine():
            ThreePointArc((-94.2249075865, 7.5514165502), (-94.2249075865, 5.3593855285), (-92.0328765648, 5.3593855285))
            Line((-92.0328765648, 5.3593855285), (-94.2249075865, 7.5514165502))
        make_face()
        with BuildLine():
            Line((-94.2249075865, 7.5514165502), (-92.0328765648, 5.3593855285))
            ThreePointArc((-92.0328765648, 5.3593855285), (-91.6968788002, 5.8622417192), (-91.5788920756, 6.4554010393))
            ThreePointArc((-91.5788920756, 6.4554010393), (-92.5357327555, 7.8874143147), (-94.2249075865, 7.5514165502))
        make_face()
        with BuildLine():
            Line((18.1551993662, -90.6865547787), (23.3946861174, -95.9260415299))
            ThreePointArc((23.3946861174, -95.9260415299), (25.8707084556, -95.8448687061), (28.3295816805, -96.1468920665))
            ThreePointArc((28.3295816805, -96.1468920665), (22.839753912, -94.1669662375), (18.1551993662, -90.6865547787))
        make_face()
        with BuildLine():
            ThreePointArc((9.4734010854, -115.0030729893), (9.1713776761, -112.5441996308), (9.2525504936, -110.0681771537))
            Line((9.2525504936, -110.0681771537), (4.0130642277, -104.8286908877))
            ThreePointArc((4.0130642277, -104.8286908877), (7.4934754292, -109.5132453732), (9.4734010854, -115.0030729893))
        make_face()
        with BuildLine():
            Line((-49.5222903639, -51.2933362961), (-50.9867564519, -49.8288702081))
            Line((-50.9867564519, -49.8288702081), (-53.0578242638, -49.8288702081))
            ThreePointArc((-53.0578242638, -49.8288702081), (-51.1444071059, -50.2094725439), (-49.5222903639, -51.2933362961))
        make_face()
        with BuildLine():
            Line((-92.8446208282, -10.0420736437), (-92.8446208282, -7.9710058318))
            Line((-92.8446208282, -7.9710058318), (-94.3090869492, -6.5065397108))
            ThreePointArc((-94.3090869492, -6.5065397108), (-93.2252231729, -8.1286564643), (-92.8446208282, -10.0420736437))
        make_face()
        with BuildLine():
            Line((-109.3923480429, 8.5767213829), (-104.4426005746, 3.6269739146))
            Line((-104.4426005746, 3.6269739146), (-102.0030821795, 6.0664923097))
            ThreePointArc((-102.0030821795, 6.0664923097), (-102.0030821795, 8.2585233314), (-99.8110511578, 8.2585233314))
            Line((-99.8110511578, 8.2585233314), (-97.3715327627, 10.6980417265))
            Line((-97.3715327627, 10.6980417265), (-102.3212802311, 15.6477891948))
            Line((-102.3212802311, 15.6477891948), (-109.3923480429, 8.5767213829))
        make_face()
        with BuildLine():
            Line((-92.739983346, 15.3295911432), (-90.3004649509, 17.7691095383))
            Line((-90.3004649509, 17.7691095383), (-95.2502124192, 22.7188570066))
            Line((-95.2502124192, 22.7188570066), (-102.3212802311, 15.6477891948))
            Line((-102.3212802311, 15.6477891948), (-97.3715327627, 10.6980417265))
            Line((-97.3715327627, 10.6980417265), (-94.9320143677, 13.1375601216))
            ThreePointArc((-94.9320143677, 13.1375601216), (-94.9320143677, 15.3295911432), (-92.739983346, 15.3295911432))
        make_face()
        with BuildLine():
            Line((-147.8444409361, 47.0288142761), (-109.3923480429, 8.5767213829))
            Line((-109.3923480429, 8.5767213829), (-102.3212802311, 15.6477891948))
            Line((-102.3212802311, 15.6477891948), (-143.5309123292, 56.8574212929))
            ThreePointArc((-143.5309123292, 56.8574212929), (-147.9164175979, 53.74892469), (-153.0839277737, 52.2683011137))
            Line((-153.0839277737, 52.2683011137), (-147.8444409361, 47.0288142761))
        make_face()
        with BuildLine():
            Line((-102.3212802311, 15.6477891948), (-95.2502124192, 22.7188570066))
            Line((-95.2502124192, 22.7188570066), (-133.7023062703, 61.1709508578))
            Line((-133.7023062703, 61.1709508578), (-138.94179215, 66.4104367374))
            ThreePointArc((-138.94179215, 66.4104367374), (-140.4224157263, 61.2429265616), (-143.5309123292, 56.8574212929))
            Line((-143.5309123292, 56.8574212929), (-102.3212802311, 15.6477891948))
        make_face()
        with BuildLine():
            ThreePointArc((-158.0188232221, 52.4891516271), (-152.528995463, 50.5092257647), (-147.8444409361, 47.0288142761))
            Line((-147.8444409361, 47.0288142761), (-153.0839277737, 52.2683011137))
            ThreePointArc((-153.0839277737, 52.2683011137), (-155.5599500534, 52.1871282873), (-158.0188232221, 52.4891516271))
        make_face()
        with BuildLine():
            Line((-138.94179215, 66.4104367374), (-133.7023062703, 61.1709508578))
            ThreePointArc((-133.7023062703, 61.1709508578), (-137.1827173467, 65.8555054434), (-139.1626428524, 71.3453331199))
            ThreePointArc((-139.1626428524, 71.3453331199), (-138.9243248571, 69.7661771874), (-138.8446208282, 68.1711297919))
            ThreePointArc((-138.8446208282, 68.1711297919), (-138.8689321286, 67.289443581), (-138.94179215, 66.4104367374))
        make_face()
        with BuildLine():
            ThreePointArc((-153.0839277737, 52.2683011137), (-147.9164175979, 53.74892469), (-143.5309123292, 56.8574212929))
            ThreePointArc((-143.5309123292, 56.8574212929), (-140.4224157263, 61.2429265616), (-138.94179215, 66.4104367374))
            ThreePointArc((-138.94179215, 66.4104367374), (-138.8689321286, 67.289443581), (-138.8446208282, 68.1711297919))
            ThreePointArc((-138.8446208282, 68.1711297919), (-138.9243248571, 69.7661771874), (-139.1626428524, 71.3453331199))
            ThreePointArc((-139.1626428524, 71.3453331199), (-166.1583296641, 79.4848379539), (-158.0188232221, 52.4891516271))
            ThreePointArc((-158.0188232221, 52.4891516271), (-155.5599500534, 52.1871282873), (-153.0839277737, 52.2683011137))
        make_face()
    extrude(amount=F1_DEPTH)


solid = Compound([f1.part, f1b.part, f1c.part])
